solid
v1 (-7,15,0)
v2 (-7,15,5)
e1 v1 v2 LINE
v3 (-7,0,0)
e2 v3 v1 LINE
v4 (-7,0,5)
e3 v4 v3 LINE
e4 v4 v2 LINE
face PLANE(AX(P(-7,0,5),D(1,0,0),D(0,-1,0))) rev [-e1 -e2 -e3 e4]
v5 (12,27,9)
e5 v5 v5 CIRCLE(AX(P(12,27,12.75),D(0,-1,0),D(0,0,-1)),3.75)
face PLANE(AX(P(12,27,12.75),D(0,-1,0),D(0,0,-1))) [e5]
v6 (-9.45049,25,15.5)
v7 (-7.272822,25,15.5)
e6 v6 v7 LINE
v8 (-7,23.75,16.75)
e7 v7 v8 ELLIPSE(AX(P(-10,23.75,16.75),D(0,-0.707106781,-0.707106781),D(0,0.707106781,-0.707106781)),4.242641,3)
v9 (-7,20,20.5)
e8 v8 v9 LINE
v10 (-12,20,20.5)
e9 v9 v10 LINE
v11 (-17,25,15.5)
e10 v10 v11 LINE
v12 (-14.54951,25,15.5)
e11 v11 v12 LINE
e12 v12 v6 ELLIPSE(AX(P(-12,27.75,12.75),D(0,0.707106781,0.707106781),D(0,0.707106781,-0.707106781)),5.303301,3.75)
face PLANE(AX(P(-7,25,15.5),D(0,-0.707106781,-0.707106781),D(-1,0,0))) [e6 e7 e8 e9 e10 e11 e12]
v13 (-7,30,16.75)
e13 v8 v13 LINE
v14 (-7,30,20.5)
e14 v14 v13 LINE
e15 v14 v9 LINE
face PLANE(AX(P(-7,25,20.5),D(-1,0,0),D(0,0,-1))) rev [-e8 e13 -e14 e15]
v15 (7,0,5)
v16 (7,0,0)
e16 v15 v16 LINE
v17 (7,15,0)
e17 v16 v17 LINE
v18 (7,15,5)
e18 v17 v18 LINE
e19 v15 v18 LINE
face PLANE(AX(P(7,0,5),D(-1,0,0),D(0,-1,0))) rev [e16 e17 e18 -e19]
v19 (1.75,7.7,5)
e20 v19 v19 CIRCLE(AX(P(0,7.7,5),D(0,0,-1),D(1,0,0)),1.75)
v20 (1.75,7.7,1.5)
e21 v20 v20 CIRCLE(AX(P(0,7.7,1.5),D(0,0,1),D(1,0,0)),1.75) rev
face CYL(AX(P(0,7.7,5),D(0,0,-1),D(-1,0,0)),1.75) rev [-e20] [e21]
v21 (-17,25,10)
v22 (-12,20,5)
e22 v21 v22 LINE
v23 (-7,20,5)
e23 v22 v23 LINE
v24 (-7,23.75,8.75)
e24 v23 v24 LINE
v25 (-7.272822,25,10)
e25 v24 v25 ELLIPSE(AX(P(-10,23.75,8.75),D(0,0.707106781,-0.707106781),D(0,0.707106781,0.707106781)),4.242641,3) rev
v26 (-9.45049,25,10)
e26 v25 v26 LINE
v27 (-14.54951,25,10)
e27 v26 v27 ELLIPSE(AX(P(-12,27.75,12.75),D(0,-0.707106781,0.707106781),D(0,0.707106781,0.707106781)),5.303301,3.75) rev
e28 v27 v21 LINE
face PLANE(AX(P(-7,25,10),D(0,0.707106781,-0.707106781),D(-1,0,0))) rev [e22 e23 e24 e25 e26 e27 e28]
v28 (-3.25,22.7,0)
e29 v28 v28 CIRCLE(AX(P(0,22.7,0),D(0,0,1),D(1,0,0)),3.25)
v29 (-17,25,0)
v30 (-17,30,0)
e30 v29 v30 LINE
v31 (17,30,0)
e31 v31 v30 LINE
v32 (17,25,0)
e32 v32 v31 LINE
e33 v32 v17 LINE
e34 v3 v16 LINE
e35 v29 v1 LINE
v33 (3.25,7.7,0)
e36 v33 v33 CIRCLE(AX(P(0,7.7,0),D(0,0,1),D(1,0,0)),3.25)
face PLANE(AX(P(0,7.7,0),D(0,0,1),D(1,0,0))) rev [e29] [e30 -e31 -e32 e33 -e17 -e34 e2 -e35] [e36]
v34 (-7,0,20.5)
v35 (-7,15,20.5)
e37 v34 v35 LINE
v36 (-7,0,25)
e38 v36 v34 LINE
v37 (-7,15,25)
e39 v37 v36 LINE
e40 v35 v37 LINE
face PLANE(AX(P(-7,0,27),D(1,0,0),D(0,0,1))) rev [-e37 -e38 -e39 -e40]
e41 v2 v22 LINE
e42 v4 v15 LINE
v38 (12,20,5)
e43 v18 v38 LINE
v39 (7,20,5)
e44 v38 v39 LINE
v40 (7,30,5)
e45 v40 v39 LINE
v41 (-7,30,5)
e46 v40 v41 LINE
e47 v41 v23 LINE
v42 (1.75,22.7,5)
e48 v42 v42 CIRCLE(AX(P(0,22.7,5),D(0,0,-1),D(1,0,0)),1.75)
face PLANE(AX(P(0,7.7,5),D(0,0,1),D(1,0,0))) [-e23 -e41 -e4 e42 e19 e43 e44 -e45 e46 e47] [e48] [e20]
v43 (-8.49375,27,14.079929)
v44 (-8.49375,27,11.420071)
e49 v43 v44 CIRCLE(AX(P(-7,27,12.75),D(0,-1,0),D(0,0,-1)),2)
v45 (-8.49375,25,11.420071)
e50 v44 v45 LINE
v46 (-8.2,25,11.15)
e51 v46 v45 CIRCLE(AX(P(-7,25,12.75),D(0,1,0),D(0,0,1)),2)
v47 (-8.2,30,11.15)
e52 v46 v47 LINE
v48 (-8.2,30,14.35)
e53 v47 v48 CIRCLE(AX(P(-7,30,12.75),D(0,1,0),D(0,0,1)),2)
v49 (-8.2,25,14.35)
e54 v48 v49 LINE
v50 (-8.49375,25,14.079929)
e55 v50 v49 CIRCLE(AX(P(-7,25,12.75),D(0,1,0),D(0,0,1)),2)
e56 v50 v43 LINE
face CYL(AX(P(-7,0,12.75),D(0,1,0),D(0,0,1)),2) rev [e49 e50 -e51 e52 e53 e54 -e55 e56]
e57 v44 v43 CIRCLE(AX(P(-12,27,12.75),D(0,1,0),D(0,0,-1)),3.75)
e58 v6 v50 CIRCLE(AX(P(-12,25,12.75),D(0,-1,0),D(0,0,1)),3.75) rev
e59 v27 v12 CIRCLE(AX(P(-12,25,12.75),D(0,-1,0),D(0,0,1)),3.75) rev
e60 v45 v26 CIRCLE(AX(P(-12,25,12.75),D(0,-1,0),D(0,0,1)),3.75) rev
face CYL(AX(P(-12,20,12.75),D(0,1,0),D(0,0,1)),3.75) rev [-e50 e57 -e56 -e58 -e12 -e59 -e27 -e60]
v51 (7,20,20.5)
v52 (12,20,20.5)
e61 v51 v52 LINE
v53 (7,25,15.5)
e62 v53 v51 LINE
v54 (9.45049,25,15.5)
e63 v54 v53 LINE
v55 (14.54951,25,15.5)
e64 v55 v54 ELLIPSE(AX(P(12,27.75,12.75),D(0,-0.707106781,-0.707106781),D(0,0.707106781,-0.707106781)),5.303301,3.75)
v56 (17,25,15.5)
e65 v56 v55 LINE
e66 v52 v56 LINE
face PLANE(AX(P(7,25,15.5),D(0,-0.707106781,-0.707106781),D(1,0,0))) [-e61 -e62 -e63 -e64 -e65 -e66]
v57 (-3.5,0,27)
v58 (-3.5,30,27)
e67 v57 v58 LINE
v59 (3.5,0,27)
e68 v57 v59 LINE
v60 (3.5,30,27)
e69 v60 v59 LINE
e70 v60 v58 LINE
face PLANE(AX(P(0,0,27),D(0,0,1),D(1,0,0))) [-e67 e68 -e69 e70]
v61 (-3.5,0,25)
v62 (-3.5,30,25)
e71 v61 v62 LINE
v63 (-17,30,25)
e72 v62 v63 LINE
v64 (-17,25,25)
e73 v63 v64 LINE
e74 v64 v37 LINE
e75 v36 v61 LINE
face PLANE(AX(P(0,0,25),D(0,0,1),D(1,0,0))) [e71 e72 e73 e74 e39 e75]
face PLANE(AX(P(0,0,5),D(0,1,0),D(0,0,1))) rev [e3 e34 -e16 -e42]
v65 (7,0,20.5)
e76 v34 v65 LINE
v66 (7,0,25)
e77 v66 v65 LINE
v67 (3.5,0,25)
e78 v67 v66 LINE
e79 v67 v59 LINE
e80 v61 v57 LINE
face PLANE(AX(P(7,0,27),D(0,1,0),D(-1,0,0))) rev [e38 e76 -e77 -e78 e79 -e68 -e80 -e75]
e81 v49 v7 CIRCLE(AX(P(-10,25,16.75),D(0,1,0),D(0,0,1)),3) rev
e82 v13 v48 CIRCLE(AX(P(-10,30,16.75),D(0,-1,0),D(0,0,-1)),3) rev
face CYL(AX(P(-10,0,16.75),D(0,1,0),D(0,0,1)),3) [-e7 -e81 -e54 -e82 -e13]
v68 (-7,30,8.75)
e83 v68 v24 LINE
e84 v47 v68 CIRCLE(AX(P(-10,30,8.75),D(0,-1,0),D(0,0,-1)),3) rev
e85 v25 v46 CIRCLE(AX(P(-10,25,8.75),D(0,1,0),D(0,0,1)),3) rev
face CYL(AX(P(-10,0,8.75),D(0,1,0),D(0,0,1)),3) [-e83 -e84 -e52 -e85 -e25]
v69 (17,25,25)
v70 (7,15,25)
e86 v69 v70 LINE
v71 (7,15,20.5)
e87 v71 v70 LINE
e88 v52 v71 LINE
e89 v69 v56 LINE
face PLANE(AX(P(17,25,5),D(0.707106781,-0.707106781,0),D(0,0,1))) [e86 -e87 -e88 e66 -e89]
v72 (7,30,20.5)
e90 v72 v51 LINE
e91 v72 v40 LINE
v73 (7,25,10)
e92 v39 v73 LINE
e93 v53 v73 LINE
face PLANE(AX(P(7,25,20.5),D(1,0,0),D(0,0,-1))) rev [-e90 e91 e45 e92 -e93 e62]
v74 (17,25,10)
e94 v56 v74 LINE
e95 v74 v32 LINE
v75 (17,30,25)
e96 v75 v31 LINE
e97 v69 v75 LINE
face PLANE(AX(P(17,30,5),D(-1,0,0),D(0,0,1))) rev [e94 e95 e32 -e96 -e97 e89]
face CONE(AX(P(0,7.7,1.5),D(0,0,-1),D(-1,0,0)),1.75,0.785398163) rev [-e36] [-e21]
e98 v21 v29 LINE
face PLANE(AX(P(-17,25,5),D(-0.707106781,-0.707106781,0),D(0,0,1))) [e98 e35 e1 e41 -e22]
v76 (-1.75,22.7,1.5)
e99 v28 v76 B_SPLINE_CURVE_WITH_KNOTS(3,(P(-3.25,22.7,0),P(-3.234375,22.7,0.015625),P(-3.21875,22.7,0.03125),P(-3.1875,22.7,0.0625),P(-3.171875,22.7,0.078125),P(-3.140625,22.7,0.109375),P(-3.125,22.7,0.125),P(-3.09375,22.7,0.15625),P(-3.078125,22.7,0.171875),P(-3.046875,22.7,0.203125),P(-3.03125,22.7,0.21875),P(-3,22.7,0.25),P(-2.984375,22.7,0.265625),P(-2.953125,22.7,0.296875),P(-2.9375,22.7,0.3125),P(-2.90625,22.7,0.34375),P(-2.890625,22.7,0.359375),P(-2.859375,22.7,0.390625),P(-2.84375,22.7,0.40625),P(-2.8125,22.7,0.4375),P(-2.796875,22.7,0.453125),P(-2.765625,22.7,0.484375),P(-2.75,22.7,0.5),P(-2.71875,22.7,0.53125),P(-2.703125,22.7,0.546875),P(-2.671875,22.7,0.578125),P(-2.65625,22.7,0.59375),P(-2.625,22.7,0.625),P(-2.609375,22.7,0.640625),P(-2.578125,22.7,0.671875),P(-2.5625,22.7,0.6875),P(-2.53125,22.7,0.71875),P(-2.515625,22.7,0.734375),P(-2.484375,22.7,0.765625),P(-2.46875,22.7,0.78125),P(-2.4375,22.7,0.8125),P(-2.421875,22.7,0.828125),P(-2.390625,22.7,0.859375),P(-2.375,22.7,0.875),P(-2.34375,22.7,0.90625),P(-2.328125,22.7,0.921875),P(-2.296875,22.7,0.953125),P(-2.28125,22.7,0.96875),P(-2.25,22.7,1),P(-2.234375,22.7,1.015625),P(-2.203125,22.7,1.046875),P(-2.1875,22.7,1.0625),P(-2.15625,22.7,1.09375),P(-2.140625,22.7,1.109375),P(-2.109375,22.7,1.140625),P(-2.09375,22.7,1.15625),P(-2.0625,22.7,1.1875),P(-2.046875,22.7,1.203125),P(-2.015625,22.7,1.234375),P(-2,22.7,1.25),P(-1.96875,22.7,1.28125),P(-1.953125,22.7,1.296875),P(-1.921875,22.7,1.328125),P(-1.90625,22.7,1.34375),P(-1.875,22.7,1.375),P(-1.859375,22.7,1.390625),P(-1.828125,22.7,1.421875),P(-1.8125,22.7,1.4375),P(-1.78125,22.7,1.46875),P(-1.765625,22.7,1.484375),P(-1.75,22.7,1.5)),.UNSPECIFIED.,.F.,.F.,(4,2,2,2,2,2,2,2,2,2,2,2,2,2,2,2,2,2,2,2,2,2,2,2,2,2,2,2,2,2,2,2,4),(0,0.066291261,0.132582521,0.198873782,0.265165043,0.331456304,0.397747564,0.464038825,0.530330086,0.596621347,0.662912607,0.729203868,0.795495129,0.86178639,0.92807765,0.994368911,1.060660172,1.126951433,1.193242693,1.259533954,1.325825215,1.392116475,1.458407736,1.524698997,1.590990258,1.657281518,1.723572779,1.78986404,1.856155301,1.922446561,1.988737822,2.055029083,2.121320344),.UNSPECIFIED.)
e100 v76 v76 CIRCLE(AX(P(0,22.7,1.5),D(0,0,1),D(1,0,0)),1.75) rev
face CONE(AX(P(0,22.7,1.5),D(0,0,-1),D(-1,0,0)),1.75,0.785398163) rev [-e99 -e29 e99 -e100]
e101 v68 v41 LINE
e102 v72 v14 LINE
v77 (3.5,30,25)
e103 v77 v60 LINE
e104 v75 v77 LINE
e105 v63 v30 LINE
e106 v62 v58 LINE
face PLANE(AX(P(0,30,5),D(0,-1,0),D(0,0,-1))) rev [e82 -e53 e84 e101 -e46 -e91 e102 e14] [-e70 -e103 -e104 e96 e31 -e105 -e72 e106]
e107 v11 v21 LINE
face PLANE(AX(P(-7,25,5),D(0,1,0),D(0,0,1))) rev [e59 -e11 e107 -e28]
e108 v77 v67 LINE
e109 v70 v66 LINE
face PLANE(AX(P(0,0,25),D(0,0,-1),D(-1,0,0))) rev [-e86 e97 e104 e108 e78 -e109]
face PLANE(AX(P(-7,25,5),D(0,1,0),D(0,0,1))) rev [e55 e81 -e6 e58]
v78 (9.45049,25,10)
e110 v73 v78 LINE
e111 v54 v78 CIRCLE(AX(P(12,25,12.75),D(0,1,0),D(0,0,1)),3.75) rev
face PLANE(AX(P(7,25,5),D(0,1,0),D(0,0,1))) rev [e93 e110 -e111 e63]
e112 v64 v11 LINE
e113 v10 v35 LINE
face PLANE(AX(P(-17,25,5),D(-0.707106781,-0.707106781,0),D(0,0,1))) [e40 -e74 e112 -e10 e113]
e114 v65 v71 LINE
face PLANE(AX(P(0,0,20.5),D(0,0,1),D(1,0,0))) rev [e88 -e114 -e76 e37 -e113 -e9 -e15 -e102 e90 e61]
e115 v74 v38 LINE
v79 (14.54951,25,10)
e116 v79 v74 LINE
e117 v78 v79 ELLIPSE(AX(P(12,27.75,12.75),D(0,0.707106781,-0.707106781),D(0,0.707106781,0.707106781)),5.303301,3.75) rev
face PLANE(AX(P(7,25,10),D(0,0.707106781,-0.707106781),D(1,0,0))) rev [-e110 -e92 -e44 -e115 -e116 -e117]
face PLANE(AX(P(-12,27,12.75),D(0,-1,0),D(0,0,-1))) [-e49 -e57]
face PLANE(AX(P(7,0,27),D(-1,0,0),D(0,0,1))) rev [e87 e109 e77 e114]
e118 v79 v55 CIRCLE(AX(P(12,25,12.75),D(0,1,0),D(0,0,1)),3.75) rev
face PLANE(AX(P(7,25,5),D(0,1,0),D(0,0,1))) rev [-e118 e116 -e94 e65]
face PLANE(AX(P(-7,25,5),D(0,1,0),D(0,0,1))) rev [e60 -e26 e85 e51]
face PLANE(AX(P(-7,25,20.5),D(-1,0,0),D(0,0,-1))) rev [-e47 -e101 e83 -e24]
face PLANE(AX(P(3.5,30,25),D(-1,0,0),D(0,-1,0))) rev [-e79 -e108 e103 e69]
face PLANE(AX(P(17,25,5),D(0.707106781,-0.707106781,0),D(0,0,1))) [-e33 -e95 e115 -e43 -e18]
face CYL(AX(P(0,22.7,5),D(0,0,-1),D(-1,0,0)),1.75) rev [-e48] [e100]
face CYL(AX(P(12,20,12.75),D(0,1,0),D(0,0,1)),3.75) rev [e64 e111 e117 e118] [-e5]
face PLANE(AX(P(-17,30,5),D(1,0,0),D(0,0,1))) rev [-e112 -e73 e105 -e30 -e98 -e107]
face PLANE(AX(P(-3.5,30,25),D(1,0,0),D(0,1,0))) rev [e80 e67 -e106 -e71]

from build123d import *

# Parameters (mm, degrees)
BOSS_EXTRUDE1_DEPTH     = 5
SKETCH2_W               = 10
SKETCH2_H               = 5
BOSS_EXTRUDE2_DEPTH     = 15.5
BOSS_EXTRUDE3_DEPTH     = 6.5
CHAMFER1_SIZE           = 10
CHAMFER2_SIZE           = 5
CUT_EXTRUDE1_DEPTH      = 5
CUT_EXTRUDE1_DEPTH_BACK = 2
SKETCH4_R               = 3.75
SKETCH5_W               = 13.5
SKETCH5_H               = 30
CUT_EXTRUDE2_DEPTH      = 2
CHAMFER3_SIZE           = 1.5
SKETCH6_R               = 2
CUT_EXTRUDE4_DEPTH      = 44.794976881
FILLET1_R               = 3


with BuildPart() as part:
    # Sketch1 → Boss-Extrude1 (new body)
    with BuildSketch(Plane.XY):
        with BuildLine():
            Line((0, 24.45), (0, 30))
            Line((0, 30), (17, 30))
            Line((17, 30), (17, 25))
            Line((17, 25), (7, 25))
            Line((7, 25), (7, 0))
            Line((7, 0), (0, 0))
            Line((0, 0), (0, 5.95))
            ThreePointArc((0, 5.95), (1.75, 7.7), (0, 9.45))
            Line((0, 9.45), (0, 20.95))
            ThreePointArc((0, 20.95), (1.75, 22.7), (0, 24.45))
        make_face()
    extrude(amount=BOSS_EXTRUDE1_DEPTH)

    # Sketch2 → Boss-Extrude2 (add)
    with BuildSketch(Plane.XY.offset(5)):
        with Locations((12, 27.5)):
            Rectangle(SKETCH2_W, SKETCH2_H)
    extrude(amount=BOSS_EXTRUDE2_DEPTH)

    # Sketch3 → Boss-Extrude3 (add)
    with BuildSketch(Plane.XY.offset(20.5)):
        Polygon((7, 0), (7, 25), (17, 25), (17, 30), (0, 30), (0, 0), align=None)
    extrude(amount=BOSS_EXTRUDE3_DEPTH)

    # Chamfer1
    chamfer1_edges = [part.edges().sort_by_distance(p)[0] for p in [
        (7, 25, 2.5),
        (7, 25, 23.75),
    ]]
    chamfer(chamfer1_edges, length=CHAMFER1_SIZE - 0.0001)  # a hair under: the kernel refuses the full size

    # Chamfer2
    chamfer2_edges = [part.edges().sort_by_distance(p)[0] for p in [
        (11.99995, 25, 5),
        (11.99995, 25, 20.5),
    ]]
    chamfer(chamfer2_edges, length=CHAMFER2_SIZE)

    # Sketch4 → Cut-Extrude1 (cut, two sides: drawn at the far end of the back side and taken through both)
    with BuildSketch(Plane.XZ.offset(-25).offset(-CUT_EXTRUDE1_DEPTH_BACK)):
        with Locations(Location((12, 12.75, 0), (0, 0, 132.833428066))):
            Circle(SKETCH4_R)
    extrude(amount=CUT_EXTRUDE1_DEPTH + CUT_EXTRUDE1_DEPTH_BACK, mode=Mode.SUBTRACT)

    # Mirror1: part across plane


with BuildPart() as part_1:
    add(part.part)
    add(part.part.mirror(Plane(origin=(0, 30, 27), x_dir=(0, 0, 1), z_dir=(1, 0, 0))))

    # Sketch5 → Cut-Extrude2 (cut)
    with BuildSketch(Plane.XY.offset(27)):
        with Locations((-10.25, 15)):
            Rectangle(SKETCH5_W, SKETCH5_H)
        with Locations((10.25, 15)):
            Rectangle(SKETCH5_W, SKETCH5_H)
    extrude(amount=-CUT_EXTRUDE2_DEPTH, mode=Mode.SUBTRACT)

    # Chamfer3
    chamfer3_edges = [part_1.edges().sort_by_distance(p)[0] for p in [
        (0, 9.45, 0),
        (0, 24.45, 0),
    ]]
    chamfer(chamfer3_edges, length=CHAMFER3_SIZE)

    # Sketch6 → Cut-Extrude4 (cut, through all)
    with BuildSketch(Plane(origin=(0, 30, 0), x_dir=(1, 0, 0), z_dir=(0, 1, 0))):
        with Locations((-7, -12.75)):
            Circle(SKETCH6_R)
    extrude(amount=-CUT_EXTRUDE4_DEPTH, mode=Mode.SUBTRACT)

    # Fillet1
    fillet1_edges = [part_1.edges().sort_by_distance(p)[0] for p in [
        (-7, 27.5, 14.75),
        (-7, 27.5, 10.75),
    ]]
    fillet(fillet1_edges, radius=FILLET1_R)


solid = part_1.part
